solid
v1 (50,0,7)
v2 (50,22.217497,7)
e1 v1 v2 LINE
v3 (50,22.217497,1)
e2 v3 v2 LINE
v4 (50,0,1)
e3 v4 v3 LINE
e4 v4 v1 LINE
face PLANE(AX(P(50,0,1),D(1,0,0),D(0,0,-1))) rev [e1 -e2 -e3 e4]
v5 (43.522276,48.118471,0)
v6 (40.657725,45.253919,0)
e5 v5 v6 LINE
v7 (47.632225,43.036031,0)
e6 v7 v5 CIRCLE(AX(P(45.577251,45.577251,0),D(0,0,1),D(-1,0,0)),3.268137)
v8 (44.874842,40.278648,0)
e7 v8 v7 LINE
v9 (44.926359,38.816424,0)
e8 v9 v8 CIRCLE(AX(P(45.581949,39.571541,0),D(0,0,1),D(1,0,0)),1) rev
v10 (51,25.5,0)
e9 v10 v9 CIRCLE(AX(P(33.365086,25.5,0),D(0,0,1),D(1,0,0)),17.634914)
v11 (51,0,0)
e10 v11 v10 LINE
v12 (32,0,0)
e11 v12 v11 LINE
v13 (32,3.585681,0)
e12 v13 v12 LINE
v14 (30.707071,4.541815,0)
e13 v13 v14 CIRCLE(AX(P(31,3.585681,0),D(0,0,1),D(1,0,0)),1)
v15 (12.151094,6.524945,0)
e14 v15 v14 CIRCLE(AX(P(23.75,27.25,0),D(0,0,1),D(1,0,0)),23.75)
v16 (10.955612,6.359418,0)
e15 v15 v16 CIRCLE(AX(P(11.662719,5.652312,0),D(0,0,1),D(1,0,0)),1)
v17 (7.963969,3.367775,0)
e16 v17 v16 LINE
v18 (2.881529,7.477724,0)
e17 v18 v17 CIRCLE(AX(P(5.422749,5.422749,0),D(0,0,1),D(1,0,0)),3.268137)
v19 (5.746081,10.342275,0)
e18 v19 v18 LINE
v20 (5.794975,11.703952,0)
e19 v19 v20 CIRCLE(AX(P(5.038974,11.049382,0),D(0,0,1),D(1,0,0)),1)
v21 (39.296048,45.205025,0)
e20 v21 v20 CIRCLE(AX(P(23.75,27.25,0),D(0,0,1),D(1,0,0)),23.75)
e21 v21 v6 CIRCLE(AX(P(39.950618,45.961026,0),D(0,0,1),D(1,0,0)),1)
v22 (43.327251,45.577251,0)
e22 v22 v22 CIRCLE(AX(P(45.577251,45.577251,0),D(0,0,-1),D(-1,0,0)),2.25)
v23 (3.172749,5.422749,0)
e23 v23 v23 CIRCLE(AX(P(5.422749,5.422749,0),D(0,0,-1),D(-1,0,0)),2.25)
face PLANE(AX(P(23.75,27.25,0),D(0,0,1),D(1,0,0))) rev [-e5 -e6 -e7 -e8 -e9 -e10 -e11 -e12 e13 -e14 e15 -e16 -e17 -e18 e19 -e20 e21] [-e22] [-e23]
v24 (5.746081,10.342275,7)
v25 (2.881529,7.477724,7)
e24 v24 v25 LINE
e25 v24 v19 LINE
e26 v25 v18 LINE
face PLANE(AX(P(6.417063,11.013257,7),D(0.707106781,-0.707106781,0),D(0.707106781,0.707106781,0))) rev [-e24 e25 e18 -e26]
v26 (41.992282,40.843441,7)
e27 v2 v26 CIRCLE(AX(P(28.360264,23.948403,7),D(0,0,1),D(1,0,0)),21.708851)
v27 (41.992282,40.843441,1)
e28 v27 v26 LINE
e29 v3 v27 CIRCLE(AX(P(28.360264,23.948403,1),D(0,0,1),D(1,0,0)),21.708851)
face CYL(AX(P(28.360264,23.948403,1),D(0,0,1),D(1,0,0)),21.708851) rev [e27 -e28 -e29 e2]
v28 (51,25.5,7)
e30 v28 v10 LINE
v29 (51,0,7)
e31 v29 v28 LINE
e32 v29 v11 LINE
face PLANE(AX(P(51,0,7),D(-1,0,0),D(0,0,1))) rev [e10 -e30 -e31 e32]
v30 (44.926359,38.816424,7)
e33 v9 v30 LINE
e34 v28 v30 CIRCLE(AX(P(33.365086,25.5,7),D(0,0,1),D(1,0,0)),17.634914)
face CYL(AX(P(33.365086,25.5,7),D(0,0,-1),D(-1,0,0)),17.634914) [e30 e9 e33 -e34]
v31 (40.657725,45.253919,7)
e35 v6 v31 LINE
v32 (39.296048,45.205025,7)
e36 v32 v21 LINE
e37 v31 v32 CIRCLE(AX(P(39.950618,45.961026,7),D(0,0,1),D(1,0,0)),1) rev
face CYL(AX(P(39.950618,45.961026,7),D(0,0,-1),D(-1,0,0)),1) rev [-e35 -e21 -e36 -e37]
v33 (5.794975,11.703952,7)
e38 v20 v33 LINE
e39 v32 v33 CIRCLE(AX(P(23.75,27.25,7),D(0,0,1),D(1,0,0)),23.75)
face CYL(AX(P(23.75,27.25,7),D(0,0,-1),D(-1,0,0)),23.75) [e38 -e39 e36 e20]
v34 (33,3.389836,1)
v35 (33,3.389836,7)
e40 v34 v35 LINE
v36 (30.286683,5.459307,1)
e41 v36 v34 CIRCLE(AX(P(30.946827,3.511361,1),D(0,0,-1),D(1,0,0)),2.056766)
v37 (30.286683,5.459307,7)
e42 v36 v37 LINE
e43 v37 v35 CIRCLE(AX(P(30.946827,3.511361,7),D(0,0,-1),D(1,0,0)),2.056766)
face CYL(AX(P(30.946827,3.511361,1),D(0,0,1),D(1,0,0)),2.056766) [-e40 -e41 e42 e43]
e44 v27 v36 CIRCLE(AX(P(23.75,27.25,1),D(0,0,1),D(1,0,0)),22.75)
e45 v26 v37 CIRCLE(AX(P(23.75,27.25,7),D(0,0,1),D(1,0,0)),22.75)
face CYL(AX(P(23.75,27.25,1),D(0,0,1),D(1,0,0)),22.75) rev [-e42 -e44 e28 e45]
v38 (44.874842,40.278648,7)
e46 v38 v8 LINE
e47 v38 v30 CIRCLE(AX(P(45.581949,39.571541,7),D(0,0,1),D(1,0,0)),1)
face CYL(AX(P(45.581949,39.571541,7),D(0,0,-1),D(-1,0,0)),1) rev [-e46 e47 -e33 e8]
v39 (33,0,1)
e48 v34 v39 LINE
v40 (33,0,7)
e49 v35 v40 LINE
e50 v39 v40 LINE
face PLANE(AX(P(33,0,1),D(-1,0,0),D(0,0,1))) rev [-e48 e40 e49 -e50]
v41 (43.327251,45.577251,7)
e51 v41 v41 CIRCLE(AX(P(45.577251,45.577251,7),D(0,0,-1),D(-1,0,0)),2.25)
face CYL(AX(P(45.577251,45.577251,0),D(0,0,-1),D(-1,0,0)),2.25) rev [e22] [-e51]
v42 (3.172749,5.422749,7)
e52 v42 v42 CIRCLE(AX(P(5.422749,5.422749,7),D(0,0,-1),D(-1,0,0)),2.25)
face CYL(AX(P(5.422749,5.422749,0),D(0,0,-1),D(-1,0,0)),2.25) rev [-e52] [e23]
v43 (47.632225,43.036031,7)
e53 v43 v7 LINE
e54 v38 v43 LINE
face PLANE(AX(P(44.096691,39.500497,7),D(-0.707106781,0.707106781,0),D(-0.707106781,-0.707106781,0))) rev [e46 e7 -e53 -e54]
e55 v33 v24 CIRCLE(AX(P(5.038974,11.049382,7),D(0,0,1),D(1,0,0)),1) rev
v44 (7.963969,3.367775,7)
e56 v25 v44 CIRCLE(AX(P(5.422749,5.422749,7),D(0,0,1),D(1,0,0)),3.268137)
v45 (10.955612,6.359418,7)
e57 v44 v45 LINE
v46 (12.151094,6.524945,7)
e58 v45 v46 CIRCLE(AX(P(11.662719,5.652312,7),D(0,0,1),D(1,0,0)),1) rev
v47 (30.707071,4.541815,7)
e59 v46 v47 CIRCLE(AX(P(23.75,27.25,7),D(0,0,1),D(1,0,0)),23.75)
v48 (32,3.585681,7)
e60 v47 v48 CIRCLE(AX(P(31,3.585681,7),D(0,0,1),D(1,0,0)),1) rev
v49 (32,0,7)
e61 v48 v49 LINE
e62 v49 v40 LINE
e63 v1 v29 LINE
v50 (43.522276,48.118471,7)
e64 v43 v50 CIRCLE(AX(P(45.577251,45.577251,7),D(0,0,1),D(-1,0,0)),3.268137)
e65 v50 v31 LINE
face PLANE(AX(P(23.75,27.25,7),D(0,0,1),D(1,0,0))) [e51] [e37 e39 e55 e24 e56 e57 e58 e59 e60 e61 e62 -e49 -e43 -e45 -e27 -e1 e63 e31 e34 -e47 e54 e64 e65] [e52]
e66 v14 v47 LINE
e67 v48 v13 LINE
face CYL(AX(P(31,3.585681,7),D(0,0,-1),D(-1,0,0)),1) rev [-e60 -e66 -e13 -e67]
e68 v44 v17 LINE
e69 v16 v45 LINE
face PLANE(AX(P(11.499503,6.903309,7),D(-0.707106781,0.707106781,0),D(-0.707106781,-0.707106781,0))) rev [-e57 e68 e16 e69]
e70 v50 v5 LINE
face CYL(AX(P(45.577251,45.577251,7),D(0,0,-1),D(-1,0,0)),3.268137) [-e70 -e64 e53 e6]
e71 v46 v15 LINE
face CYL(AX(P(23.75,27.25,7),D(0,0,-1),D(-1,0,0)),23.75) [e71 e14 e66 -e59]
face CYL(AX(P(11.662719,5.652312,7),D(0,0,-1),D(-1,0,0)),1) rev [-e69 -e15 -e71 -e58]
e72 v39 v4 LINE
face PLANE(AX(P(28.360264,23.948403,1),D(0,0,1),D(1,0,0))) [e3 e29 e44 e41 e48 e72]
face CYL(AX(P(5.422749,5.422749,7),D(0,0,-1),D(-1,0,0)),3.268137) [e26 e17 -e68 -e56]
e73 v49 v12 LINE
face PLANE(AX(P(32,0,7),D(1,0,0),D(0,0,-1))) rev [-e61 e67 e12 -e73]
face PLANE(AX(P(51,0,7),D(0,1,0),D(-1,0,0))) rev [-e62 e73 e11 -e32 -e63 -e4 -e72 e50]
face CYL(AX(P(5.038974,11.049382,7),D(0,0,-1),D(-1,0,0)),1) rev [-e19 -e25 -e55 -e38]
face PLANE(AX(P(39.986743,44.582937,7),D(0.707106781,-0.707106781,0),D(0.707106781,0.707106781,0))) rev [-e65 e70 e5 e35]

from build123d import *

# Parameters (mm, degrees)
BOSS_EXTRUDE1_DEPTH   = 7
FILLET1_R             = 1
FILLET2_R             = 1
FILLET3_R             = 1
CUT_EXTRUDE1_DEPTH    = 6
F_4_0MM_DOWEL_HOLE1_D = 4.5


with BuildPart() as part:
    # Sketch1 → Boss-Extrude1 (new body)
    with BuildSketch(Plane.XY):
        with BuildLine():
            Line((51, 0), (51, 25.5))
            ThreePointArc((51, 25.5), (49.182412553, 33.297587625), (44.104318796, 39.487818693))
            ThreePointArc((44.104318796, 39.487818693), (44.100505812, 39.494158329), (44.096690854, 39.500496777))
            Line((44.096690854, 39.500496777), (47.63222476, 43.036030683))
            ThreePointArc((47.63222476, 43.036030683), (48.118470522, 47.63222476), (43.522276444, 48.118470522))
            Line((43.522276444, 48.118470522), (39.986742538, 44.582936616))
            ThreePointArc((39.986742538, 44.582936616), (6.956213947, 44.043786053), (6.417063384, 11.013257462))
            Line((6.417063384, 11.013257462), (2.881529478, 7.477723556))
            ThreePointArc((2.881529478, 7.477723556), (3.36777524, 2.881529478), (7.963969317, 3.36777524))
            Line((7.963969317, 3.36777524), (11.499503223, 6.903309146))
            ThreePointArc((11.499503223, 6.903309146), (21.530362571, 3.603949385), (32, 4.978942549))
            Line((32, 4.978942549), (32, 0))
            Line((32, 0), (51, 0))
        make_face()
    extrude(amount=BOSS_EXTRUDE1_DEPTH)

    # Fillet1
    # the kernel refuses this fillet: 1 mm, written as the material it adds along each edge
    with BuildSketch(Plane(origin=(44.096690854, 39.500496777, 0), x_dir=(0.7715576110634285, -0.6361594554905989, 0), z_dir=(0, 0, 1))) as fillet1_piece_1:
        with BuildLine():
            CenterArc((1.100766551, 0.999676081), FILLET1_R, 174.506032256, 94.03559873)
            Line((0.105360267, 1.095417035), (0.005819639, 1.104991131))
            Line((0.005819639, 1.104991131), (-0.099540628, 0.009574095))
            Line((-0.099540628, 0.009574095), (-0.033285789, -0.0942977))
            ThreePointArc((-0.033285789, -0.0942977), (0.017424165, -0.104868941), (1.072770899, -0.099967608))
            Line((1.072770899, -0.099967608), (1.075315958, 0))
        make_face()
    extrude(amount=7)
    with BuildSketch(Plane(origin=(44.104318796, 39.487818693, 0), x_dir=(0.7745037653558564, -0.6325692985354254, 0), z_dir=(0, 0, 1))) as fillet1_piece_2:
        with BuildLine():
            CenterArc((1.091469777, 0.999547102), FILLET1_R, 174.23993613, 94.03559873)
            Line((0.096518871, 1.099909926), (-0.002976219, 1.109946208))
            ThreePointArc((-0.002976219, 1.109946208), (-0.113422726, 0.015030304), (-0.033782013, -0.094121069))
            Line((-0.033782013, -0.094121069), (0.003009305, -0.09995471))
            ThreePointArc((0.003009305, -0.09995471), (0.530688363, -0.092013175), (1.058367421, -0.09995471))
            Line((1.058367421, -0.09995471), (1.061376726, 0))
        make_face()
    extrude(amount=7)

    # Fillet2
    fillet2_edges = [part.edges().sort_by_distance(p)[0] for p in [
        (11.499503223, 6.903309146, 3.5),
        (6.417063384, 11.013257462, 3.5),
        (39.986742538, 44.582936616, 3.5),
    ]]
    fillet(fillet2_edges, radius=FILLET2_R)

    # Fillet3
    fillet3_edges = [part.edges().sort_by_distance(p)[0] for p in [
        (32, 4.978942549, 3.5),
    ]]
    fillet(fillet3_edges, radius=FILLET3_R)

    # Sketch2 → Cut-Extrude1 (cut)
    with BuildSketch(Plane.XY.offset(7)):
        with BuildLine():
            Line((33, 0), (33, 3.389836053))
            ThreePointArc((33, 3.389836053), (32.194148238, 5.146743671), (30.28668256, 5.459307466))
            ThreePointArc((30.28668256, 5.459307466), (2.151192178, 34.39520823), (41.992282379, 40.84344083))
            ThreePointArc((41.992282379, 40.84344083), (48.304075384, 32.522702207), (50, 22.217496636))
            Line((50, 22.217496636), (50, 0))
            Line((50, 0), (33, 0))
        make_face()
    extrude(amount=-CUT_EXTRUDE1_DEPTH, mode=Mode.SUBTRACT)

    # Ø4.0mm Dowel Hole1 (through all)
    with Locations(Plane(origin=(0, 0, 0), x_dir=(-1, 0, 0), z_dir=(0, 0, -1))):
        with Locations((-5.422749398, 5.422749398), (-45.577250602, 45.577250602)):
            Hole(F_4_0MM_DOWEL_HOLE1_D / 2)


solid = part.part
